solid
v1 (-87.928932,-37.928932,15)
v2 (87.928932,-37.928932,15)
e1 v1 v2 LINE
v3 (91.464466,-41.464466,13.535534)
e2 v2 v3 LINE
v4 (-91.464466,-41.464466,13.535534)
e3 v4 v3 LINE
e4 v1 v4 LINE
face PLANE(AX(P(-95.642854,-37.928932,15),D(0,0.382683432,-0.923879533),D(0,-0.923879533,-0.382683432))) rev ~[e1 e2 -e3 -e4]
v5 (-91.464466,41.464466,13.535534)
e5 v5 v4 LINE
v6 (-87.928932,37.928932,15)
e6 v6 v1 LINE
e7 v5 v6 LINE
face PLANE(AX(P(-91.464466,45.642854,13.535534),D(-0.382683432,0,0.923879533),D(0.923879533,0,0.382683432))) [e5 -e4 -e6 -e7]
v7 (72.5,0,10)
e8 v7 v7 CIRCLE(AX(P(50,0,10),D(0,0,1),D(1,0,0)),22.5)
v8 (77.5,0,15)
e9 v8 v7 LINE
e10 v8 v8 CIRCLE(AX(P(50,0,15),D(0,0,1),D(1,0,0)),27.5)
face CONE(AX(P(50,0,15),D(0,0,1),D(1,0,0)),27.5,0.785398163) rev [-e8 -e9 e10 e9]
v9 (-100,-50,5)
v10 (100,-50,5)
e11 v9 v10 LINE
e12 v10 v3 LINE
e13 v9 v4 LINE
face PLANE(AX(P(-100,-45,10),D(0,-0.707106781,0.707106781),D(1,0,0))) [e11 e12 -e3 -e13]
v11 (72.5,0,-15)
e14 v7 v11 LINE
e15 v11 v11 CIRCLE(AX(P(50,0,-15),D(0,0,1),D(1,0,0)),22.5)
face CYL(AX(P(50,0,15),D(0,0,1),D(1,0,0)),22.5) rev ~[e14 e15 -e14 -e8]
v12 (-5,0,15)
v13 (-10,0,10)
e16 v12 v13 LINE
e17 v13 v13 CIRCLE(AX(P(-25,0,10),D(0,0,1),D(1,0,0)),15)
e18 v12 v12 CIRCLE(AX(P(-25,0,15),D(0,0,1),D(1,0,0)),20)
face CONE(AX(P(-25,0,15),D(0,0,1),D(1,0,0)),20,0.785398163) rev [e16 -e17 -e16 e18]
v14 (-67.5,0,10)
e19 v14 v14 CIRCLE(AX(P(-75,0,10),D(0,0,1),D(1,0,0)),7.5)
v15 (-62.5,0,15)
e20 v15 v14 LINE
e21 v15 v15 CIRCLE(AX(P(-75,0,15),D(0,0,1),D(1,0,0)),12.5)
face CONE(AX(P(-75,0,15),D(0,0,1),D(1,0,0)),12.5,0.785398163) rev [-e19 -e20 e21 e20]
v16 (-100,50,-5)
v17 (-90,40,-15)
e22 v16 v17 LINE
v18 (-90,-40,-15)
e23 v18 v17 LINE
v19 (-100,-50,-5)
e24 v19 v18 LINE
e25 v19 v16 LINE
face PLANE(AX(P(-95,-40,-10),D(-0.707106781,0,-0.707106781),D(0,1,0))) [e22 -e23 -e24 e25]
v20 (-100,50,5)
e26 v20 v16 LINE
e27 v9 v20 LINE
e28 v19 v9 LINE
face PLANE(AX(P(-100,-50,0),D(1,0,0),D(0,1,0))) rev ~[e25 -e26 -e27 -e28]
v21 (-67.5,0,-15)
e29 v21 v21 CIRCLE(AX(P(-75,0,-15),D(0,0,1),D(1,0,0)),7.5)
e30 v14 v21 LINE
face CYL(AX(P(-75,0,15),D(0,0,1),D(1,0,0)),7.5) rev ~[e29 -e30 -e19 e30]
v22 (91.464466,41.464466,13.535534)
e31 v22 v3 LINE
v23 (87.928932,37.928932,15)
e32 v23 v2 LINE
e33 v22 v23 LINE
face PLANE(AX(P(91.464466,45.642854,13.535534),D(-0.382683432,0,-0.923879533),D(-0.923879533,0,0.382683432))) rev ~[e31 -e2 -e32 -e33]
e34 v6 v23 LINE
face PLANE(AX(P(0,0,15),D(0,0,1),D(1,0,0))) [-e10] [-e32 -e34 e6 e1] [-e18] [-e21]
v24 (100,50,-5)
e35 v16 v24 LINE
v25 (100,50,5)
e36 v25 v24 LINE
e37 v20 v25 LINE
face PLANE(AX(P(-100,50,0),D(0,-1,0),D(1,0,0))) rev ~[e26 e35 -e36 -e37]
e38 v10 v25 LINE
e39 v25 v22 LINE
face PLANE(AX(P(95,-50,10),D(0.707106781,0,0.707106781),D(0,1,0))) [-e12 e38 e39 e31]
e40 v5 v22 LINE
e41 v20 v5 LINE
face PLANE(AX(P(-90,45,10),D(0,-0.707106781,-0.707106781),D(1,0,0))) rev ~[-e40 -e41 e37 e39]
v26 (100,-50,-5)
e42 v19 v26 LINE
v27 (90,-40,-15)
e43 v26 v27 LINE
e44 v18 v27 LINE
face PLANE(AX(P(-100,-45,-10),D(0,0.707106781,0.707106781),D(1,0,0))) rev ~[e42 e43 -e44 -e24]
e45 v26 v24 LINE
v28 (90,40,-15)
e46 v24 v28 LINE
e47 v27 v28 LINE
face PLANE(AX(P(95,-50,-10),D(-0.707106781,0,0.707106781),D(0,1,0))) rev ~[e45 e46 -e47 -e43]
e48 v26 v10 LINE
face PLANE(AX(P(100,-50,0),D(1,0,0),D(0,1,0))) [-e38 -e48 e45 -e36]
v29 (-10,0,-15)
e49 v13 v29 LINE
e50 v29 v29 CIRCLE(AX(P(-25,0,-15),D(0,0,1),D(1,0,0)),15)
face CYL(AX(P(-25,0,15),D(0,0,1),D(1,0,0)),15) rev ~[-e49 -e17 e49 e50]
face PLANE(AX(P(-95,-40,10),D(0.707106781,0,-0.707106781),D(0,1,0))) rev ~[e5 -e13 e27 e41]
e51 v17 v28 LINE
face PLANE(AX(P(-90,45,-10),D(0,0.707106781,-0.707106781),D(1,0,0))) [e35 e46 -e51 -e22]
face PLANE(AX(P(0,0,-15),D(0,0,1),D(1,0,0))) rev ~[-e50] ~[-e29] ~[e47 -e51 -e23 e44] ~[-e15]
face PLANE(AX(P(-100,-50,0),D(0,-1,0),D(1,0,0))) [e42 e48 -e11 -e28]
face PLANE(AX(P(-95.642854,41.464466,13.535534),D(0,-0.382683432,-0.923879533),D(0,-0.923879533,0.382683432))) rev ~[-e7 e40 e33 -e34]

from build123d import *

# Parameters (mm, degrees)
F0_W        = 200
F0_H        = 100
F1_DEPTH    = 15
F2_C1_SIZE  = 10
F2_C2_SIZE  = 10
F2_C3_SIZE  = 10
F2_C4_SIZE  = 10
F2_C5_SIZE  = 10
F2_C6_SIZE  = 10
F2_C7_SIZE  = 10
F2_C8_SIZE  = 10
F3_R        = 15
F3_R_2      = 7.5
F3_R_3      = 22.5
F4_DEPTH    = 30.001
F5_T1_DEPTH = 91.2857086021
F5_T3_DEPTH = 191.2857086021


# Not quite as in the source:
# - a fillet or chamfer that OpenCascade refuses, or shapes differently, is made with other operations: its cross-section is extruded or revolved along the edge and cut away or added


with BuildPart() as f1:
    # F0 (on Top) → F1 (new body, symmetric)
    with BuildSketch(Plane.XY):
        Rectangle(F0_W, F0_H)
    extrude(amount=F1_DEPTH, both=True)

    # F2: chamfer of 10 on 8 edges, made by hand

    # F2_c1
    f2_c1_edges = [f1.edges().sort_by_distance(p)[0] for p in [
        (100, 0, -15),
    ]]
    chamfer(f2_c1_edges, length=F2_C1_SIZE)

    # F2_c2
    f2_c2_edges = [f1.edges().sort_by_distance(p)[0] for p in [
        (100, 0, 15),
    ]]
    chamfer(f2_c2_edges, length=F2_C2_SIZE)

    # F2_c3
    f2_c3_edges = [f1.edges().sort_by_distance(p)[0] for p in [
        (-5, -50, -15),
    ]]
    chamfer(f2_c3_edges, length=F2_C3_SIZE)

    # F2_c4
    f2_c4_edges = [f1.edges().sort_by_distance(p)[0] for p in [
        (-5, -50, 15),
    ]]
    chamfer(f2_c4_edges, length=F2_C4_SIZE)

    # F2_c5
    f2_c5_edges = [f1.edges().sort_by_distance(p)[0] for p in [
        (-100, 5, -15),
    ]]
    chamfer(f2_c5_edges, length=F2_C5_SIZE)

    # F2_c6
    f2_c6_edges = [f1.edges().sort_by_distance(p)[0] for p in [
        (-100, 5, 15),
    ]]
    chamfer(f2_c6_edges, length=F2_C6_SIZE)

    # F2_c7
    f2_c7_edges = [f1.edges().sort_by_distance(p)[0] for p in [
        (0, 50, 15),
    ]]
    chamfer(f2_c7_edges, length=F2_C7_SIZE)

    # F2_c8
    f2_c8_edges = [f1.edges().sort_by_distance(p)[0] for p in [
        (0, 50, -15),
    ]]
    chamfer(f2_c8_edges, length=F2_C8_SIZE)

    # F3 (on face) → F4 (cut, through all)
    with BuildSketch(Plane.XY.offset(15)):
        with Locations((-25, 0)):
            Circle(F3_R)
        with Locations((-75, 0)):
            Circle(F3_R_2)
        with Locations((50, 0)):
            Circle(F3_R_3)
    extrude(amount=-F4_DEPTH, mode=Mode.SUBTRACT)

    # F5: chamfer of 5 on 7 edges, made by hand

    # F5_s2 → F5_t1 (cut)
    with BuildSketch(Plane.XZ.offset(-45.6428543011)):
        Polygon((-91.4644660941, 13.5355339059), (-87.9289321881, 15), (-90, 15), align=None)
        Polygon((91.4644660941, 13.5355339059), (87.9289321881, 15), (90, 15), align=None)
    extrude(amount=F5_T1_DEPTH, mode=Mode.SUBTRACT)

    # F5_s4 → F5_t3 (cut)
    with BuildSketch(Plane.YZ.offset(-95.6428543011)):
        Polygon((41.4644660941, 13.5355339059), (37.9289321881, 15), (40, 15), align=None)
        Polygon((-37.9289321881, 15), (-41.4644660941, 13.5355339059), (-40, 15), align=None)
    extrude(amount=F5_T3_DEPTH, mode=Mode.SUBTRACT)

    # F5_s5 → F5_t6 (revolve, cut)
    with BuildSketch(Plane.XZ):
        Polygon((77.5, 15), (72.5, 10), (72.5, 15), align=None)
    revolve(axis=Axis((50, 0, 15), (0, 0, 1)), mode=Mode.SUBTRACT)

    # F5_s7 → F5_t8 (revolve, cut)
    with BuildSketch(Plane.XZ):
        Polygon((-5, 15), (-10, 10), (-10, 15), align=None)
    revolve(axis=Axis((-25, 0, 15), (0, 0, 1)), mode=Mode.SUBTRACT)

    # F5_s9 → F5_t10 (revolve, cut)
    with BuildSketch(Plane.XZ):
        Polygon((-62.5, 15), (-67.5, 10), (-67.5, 15), align=None)
    revolve(axis=Axis((-75, 0, 15), (0, 0, 1)), mode=Mode.SUBTRACT)


solid = f1.part
